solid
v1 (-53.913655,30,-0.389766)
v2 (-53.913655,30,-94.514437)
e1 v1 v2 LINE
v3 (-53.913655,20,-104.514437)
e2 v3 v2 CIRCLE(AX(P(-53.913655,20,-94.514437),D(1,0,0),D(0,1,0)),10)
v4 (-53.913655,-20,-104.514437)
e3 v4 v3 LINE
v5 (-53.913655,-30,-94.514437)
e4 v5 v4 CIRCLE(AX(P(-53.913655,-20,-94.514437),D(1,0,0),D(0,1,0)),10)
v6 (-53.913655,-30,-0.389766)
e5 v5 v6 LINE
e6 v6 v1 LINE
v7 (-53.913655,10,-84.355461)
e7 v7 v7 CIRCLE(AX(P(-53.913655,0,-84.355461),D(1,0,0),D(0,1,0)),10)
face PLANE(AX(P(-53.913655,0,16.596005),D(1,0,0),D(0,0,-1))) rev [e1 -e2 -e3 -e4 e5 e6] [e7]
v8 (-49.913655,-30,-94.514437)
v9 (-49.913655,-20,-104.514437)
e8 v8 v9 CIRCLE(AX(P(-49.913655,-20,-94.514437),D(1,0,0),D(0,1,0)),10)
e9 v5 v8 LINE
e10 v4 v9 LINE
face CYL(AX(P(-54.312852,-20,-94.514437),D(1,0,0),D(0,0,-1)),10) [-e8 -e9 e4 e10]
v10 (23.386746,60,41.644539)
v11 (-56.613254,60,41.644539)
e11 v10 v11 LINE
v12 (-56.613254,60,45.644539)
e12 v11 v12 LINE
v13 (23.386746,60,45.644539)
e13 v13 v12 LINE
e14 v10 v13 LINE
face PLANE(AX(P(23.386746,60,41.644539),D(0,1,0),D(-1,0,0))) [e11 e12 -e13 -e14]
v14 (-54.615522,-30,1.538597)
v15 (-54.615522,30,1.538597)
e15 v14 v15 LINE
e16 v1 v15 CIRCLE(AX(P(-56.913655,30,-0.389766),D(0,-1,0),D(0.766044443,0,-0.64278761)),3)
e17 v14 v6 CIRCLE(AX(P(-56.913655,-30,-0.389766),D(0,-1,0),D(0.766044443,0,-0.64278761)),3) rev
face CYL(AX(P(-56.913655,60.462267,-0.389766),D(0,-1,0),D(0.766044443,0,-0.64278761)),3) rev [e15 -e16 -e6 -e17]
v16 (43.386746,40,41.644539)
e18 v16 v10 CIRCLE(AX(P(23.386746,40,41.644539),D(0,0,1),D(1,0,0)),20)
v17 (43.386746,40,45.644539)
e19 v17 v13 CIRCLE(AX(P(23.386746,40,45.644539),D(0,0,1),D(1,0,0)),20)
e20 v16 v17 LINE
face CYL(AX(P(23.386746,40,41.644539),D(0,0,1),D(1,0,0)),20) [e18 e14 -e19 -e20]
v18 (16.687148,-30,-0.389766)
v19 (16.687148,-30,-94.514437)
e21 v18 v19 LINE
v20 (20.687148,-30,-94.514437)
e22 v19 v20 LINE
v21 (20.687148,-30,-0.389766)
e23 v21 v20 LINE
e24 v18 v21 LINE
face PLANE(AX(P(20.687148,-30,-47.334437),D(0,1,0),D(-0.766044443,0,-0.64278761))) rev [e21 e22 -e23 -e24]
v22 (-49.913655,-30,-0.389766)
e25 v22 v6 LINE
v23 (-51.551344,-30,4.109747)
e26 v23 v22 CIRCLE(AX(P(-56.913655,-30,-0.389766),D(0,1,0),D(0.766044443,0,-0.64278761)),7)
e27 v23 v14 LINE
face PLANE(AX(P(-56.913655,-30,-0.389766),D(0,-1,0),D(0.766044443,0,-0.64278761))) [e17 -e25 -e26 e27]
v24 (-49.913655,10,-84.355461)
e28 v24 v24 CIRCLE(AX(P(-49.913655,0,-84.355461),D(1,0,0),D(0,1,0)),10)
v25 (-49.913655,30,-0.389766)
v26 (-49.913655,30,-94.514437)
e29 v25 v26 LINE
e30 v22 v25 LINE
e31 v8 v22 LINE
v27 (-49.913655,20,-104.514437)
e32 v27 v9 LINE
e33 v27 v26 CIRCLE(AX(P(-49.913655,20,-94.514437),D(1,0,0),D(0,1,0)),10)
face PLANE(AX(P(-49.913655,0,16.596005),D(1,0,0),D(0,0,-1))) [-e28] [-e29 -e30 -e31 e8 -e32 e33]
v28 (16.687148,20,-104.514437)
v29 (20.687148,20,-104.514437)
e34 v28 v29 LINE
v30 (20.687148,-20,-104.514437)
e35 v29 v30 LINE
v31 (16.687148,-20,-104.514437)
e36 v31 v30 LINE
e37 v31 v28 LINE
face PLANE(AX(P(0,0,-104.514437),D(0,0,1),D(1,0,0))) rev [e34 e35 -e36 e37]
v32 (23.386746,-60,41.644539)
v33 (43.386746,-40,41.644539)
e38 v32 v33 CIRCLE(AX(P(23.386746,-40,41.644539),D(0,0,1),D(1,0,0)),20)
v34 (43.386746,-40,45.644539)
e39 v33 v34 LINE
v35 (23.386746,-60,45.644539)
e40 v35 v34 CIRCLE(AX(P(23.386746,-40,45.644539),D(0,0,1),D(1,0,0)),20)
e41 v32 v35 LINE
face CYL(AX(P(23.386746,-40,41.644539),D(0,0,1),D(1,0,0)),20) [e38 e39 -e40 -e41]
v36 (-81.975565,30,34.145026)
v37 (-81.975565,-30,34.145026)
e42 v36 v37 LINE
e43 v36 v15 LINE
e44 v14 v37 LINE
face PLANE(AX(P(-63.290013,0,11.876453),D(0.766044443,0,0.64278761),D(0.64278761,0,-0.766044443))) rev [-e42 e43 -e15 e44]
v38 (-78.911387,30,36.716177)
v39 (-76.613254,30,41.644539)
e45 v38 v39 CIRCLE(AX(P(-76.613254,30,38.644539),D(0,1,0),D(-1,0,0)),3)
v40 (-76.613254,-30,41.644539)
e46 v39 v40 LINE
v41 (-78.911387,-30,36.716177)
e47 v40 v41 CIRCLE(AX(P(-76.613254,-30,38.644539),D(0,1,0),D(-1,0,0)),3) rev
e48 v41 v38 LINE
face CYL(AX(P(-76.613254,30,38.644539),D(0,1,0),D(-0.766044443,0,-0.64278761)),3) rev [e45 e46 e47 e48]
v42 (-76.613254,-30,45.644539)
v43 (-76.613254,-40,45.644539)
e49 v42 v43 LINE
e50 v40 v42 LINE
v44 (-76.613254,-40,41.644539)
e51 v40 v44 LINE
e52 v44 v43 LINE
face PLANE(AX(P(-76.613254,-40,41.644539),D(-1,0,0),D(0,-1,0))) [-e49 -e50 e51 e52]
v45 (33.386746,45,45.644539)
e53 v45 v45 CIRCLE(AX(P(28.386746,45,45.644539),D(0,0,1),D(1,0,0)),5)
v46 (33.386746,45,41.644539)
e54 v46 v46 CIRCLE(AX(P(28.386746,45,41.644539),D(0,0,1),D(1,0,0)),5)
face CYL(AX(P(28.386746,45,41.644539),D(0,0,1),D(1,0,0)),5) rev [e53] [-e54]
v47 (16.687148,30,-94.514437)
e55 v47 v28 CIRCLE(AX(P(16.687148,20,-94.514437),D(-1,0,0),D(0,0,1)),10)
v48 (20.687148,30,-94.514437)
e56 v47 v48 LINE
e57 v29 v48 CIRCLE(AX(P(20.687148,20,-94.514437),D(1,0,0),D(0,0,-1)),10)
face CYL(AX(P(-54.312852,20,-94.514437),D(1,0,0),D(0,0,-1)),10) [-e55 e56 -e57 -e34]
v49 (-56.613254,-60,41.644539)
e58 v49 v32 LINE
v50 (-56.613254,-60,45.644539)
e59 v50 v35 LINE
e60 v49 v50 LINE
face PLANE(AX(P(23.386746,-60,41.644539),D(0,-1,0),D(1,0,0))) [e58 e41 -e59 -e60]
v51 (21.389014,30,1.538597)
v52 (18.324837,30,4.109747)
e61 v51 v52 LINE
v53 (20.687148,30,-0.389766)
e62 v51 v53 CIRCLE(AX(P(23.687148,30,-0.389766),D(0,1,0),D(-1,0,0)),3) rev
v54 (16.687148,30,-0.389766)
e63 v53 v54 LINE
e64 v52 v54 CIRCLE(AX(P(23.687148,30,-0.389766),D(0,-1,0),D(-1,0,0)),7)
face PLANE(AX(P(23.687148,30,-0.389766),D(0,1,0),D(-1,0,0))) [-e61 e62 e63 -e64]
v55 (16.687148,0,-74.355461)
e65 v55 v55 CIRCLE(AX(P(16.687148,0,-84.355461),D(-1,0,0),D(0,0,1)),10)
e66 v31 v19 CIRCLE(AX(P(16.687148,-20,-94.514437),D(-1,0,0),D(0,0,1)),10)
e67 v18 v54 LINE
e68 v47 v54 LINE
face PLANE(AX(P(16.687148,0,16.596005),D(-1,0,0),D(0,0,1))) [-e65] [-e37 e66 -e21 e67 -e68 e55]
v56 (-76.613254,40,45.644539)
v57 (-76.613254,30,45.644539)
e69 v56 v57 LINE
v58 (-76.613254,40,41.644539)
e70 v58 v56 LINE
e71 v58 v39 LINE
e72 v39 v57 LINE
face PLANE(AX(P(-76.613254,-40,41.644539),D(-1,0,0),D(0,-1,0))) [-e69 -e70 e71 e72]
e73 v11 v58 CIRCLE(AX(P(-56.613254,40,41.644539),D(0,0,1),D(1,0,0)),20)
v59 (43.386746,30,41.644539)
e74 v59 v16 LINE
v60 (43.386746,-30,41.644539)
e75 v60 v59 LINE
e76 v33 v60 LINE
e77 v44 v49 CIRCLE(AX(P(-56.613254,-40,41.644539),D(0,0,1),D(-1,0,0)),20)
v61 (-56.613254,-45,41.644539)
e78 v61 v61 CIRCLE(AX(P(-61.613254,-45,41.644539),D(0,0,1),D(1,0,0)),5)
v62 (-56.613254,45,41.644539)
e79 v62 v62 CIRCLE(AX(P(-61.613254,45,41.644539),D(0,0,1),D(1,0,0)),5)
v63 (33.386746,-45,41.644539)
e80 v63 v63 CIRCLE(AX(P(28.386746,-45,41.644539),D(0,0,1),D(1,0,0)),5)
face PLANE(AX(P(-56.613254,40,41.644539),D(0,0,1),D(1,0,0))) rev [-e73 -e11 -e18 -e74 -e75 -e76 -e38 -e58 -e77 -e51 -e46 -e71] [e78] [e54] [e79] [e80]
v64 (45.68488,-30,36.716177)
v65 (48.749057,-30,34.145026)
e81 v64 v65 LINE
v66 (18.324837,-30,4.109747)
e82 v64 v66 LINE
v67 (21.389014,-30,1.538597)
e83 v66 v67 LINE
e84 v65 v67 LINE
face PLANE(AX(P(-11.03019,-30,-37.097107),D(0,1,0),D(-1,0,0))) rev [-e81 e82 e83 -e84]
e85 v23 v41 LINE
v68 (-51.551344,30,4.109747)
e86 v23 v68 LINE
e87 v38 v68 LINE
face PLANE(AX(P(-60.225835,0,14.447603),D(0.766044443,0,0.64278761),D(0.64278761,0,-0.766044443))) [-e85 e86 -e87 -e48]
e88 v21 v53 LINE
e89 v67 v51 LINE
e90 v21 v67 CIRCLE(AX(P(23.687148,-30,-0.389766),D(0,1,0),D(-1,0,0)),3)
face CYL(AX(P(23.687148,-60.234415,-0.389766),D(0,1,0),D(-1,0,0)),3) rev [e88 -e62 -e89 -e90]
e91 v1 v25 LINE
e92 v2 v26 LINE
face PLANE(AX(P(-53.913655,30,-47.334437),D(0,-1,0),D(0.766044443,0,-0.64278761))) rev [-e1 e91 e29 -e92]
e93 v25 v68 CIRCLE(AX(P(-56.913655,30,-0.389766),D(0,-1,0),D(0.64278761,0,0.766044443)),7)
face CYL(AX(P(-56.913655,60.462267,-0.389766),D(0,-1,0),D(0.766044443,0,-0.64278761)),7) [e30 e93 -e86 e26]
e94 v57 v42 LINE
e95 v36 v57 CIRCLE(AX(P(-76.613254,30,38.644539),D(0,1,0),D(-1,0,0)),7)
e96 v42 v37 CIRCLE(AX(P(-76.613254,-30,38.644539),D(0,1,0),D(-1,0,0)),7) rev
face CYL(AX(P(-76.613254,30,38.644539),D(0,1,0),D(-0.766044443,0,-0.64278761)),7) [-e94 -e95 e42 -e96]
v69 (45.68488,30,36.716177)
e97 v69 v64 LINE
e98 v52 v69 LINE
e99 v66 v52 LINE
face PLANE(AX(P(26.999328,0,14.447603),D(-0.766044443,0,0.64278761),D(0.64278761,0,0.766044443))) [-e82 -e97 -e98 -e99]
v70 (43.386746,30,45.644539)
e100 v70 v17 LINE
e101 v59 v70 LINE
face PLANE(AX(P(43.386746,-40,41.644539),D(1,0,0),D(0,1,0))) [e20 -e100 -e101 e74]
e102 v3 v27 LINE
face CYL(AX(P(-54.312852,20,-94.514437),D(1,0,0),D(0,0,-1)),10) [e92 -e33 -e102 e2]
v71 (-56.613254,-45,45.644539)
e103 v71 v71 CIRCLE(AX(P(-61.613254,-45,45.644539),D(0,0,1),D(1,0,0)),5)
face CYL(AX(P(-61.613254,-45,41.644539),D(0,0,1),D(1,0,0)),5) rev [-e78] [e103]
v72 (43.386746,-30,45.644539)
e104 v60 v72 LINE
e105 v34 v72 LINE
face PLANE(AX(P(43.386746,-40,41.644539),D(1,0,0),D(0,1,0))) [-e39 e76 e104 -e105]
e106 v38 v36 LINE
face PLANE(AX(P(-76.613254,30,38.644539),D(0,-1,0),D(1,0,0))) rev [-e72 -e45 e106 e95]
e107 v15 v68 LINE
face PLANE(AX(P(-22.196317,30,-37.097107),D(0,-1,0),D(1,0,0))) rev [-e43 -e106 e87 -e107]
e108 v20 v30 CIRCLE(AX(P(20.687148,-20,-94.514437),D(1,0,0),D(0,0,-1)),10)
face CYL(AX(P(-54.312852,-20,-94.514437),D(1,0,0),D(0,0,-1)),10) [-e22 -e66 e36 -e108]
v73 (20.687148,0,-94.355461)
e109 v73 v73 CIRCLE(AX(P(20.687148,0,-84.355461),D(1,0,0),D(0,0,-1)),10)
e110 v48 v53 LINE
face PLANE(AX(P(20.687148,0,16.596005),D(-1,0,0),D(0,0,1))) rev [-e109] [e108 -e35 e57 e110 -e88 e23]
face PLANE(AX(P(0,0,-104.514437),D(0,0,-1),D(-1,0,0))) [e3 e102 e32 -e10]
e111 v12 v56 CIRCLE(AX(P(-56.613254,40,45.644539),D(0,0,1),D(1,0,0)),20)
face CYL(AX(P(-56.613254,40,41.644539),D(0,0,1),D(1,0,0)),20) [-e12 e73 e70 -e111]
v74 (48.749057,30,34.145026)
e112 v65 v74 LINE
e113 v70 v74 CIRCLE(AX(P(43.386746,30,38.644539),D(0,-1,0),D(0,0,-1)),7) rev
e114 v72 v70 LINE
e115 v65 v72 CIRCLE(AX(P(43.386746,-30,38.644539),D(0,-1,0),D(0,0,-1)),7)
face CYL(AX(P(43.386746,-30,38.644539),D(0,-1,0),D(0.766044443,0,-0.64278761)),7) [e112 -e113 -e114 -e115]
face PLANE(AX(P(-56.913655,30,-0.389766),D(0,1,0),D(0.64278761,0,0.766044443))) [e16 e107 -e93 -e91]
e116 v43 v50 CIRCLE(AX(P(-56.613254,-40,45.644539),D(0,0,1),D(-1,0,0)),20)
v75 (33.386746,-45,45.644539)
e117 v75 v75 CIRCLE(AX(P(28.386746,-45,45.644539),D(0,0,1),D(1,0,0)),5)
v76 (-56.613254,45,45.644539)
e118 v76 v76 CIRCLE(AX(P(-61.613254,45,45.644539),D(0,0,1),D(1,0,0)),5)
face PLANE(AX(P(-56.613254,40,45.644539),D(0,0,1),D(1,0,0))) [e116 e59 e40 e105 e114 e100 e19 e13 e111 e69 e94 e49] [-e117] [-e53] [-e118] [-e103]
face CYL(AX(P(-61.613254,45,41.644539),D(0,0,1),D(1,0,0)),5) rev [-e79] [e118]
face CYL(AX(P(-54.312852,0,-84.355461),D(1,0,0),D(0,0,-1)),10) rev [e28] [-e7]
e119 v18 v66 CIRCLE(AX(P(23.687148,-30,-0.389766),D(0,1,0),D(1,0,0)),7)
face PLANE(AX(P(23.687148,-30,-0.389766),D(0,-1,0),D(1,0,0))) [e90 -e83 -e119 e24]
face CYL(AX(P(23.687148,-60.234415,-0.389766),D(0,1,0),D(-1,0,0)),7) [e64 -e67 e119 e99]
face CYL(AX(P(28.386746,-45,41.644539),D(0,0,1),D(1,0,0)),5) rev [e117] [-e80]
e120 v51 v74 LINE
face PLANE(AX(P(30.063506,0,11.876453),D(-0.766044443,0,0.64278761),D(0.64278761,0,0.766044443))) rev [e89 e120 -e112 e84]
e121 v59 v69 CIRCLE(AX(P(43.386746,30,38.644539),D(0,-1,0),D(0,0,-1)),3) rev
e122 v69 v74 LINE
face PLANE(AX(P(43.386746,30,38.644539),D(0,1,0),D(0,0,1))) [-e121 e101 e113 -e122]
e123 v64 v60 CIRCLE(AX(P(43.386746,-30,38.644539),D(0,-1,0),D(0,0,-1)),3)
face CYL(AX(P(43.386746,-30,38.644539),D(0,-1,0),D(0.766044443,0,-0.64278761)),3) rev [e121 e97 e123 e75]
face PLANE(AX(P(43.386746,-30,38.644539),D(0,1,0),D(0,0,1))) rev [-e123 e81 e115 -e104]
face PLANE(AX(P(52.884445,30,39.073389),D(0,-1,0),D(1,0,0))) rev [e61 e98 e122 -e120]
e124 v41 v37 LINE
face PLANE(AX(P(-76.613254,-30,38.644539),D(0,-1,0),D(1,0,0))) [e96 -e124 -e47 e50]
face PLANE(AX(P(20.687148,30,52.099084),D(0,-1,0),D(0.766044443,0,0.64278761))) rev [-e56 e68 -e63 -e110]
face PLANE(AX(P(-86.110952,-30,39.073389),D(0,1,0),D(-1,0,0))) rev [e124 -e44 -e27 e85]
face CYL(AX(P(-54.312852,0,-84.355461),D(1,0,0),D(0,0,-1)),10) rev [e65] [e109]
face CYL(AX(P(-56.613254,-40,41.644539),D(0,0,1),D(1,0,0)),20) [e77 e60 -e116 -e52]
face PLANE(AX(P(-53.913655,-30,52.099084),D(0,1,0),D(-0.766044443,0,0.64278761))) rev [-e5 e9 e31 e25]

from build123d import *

# Parameters (mm, degrees)
SCHIZZO1_R                           = 5
BASE_FLANGIA1_DEPTH                  = 4
BORDO_FLANGIA1_DEPTH                 = 60
BORDO_FLANGIA1_BEND_DEPTH            = 60
PIEGATURA_START                      = -60
PIEGATURA_DELLO_SCHIZZO1_DEPTH       = 120
PIEGATURA_DELLO_SCHIZZO1_2_DEPTH     = 30
PIEGATURA_START_2                    = 30
PIEGATURA_DELLO_SCHIZZO1_3_DEPTH     = 30
PIEGATURA_START_3                    = -30
PIEGATURA_DELLO_SCHIZZO1_4_OUTLINE_W = 4
PIEGATURA_DELLO_SCHIZZO1_4_OUTLINE_H = 43.334436945
PIEGATURA_DELLO_SCHIZZO1_4_DEPTH     = 60
PIEGATURA_START_4                    = -40
PIEGATURA_DELLO_SCHIZZO1_5_DEPTH     = 79.9999999
PIEGATURA_DELLO_SCHIZZO1_6_DEPTH     = 120
PIEGATURA_START_5                    = -33.183921824
PIEGATURA_DELLO_SCHIZZO1_7_OUTLINE_R = 5
PIEGATURA_DELLO_SCHIZZO1_7_DEPTH     = 4
PIEGATURA_DELLO_SCHIZZO2_DEPTH       = 120
PIEGATURA_DELLO_SCHIZZO2_2_DEPTH     = 30
PIEGATURA_DELLO_SCHIZZO2_3_DEPTH     = 30
PIEGATURA_DELLO_SCHIZZO2_4_DEPTH     = 60
PIEGATURA_DELLO_SCHIZZO2_5_DEPTH     = 79.9999999
PIEGATURA_DELLO_SCHIZZO2_6_DEPTH     = 120
PIEGATURA_START_6                    = 41.644539399
PIEGATURA_DELLO_SCHIZZO2_7_OUTLINE_R = 5
PIEGATURA_DELLO_SCHIZZO2_7_DEPTH     = 4
SCHIZZO25_W                          = 4
SCHIZZO25_H                          = 60
ESTRUSIONE_ESTRUSIONE1_DEPTH         = 57.18
TAGLIO_ESTRUSIONE1_DEPTH             = 75


with BuildPart() as part:
    # Base-Flangia1: sheet metal written as solids
    # Schizzo1 → Base-Flangia1 (new body)
    with BuildSketch(Plane.XY):
        with BuildLine():
            Line((40, -60), (-40, -60))
            ThreePointArc((-40, -60), (-54.142135624, -54.142135624), (-60, -40))
            Line((-60, -40), (-60, 40))
            ThreePointArc((-60, 40), (-54.142135624, 54.142135624), (-40, 60))
            Line((-40, 60), (40, 60))
            ThreePointArc((40, 60), (54.142135624, 54.142135624), (60, 40))
            Line((60, 40), (60, -40))
            ThreePointArc((60, -40), (54.142135624, -54.142135624), (40, -60))
        make_face()
        with Locations((-45, 45)):
            Circle(SCHIZZO1_R, mode=Mode.SUBTRACT)
        with Locations((45, 45)):
            Circle(SCHIZZO1_R, mode=Mode.SUBTRACT)
        with Locations((-45, -45)):
            Circle(SCHIZZO1_R, mode=Mode.SUBTRACT)
        with Locations((45, -45)):
            Circle(SCHIZZO1_R, mode=Mode.SUBTRACT)
    extrude(amount=-BASE_FLANGIA1_DEPTH)

    # Bordo-Flangia1: sheet metal written as solids
    # Bordo-Flangia1 section (on a plane across the edge) → Bordo-Flangia1 (add)
    with BuildSketch(Plane(origin=(-66.433520762, -30, -4), x_dir=(0.7660444431189795, 5.514832408348335e-15, 0.6427876096865378), z_dir=(0, 1, 0))):
        with BuildLine():
            Line((-4, 6.433520762), (-4, 99.433520762))
            Line((-4, 99.433520762), (0, 99.433520762))
            Line((0, 99.433520762), (0, 6.433520762))
            ThreePointArc((0, 6.433520762), (1.732145215, 3.7145974), (4.928362829, 4.135387432))
            Line((4.928362829, 4.135387432), (7.499513268, 1.07120966))
            ThreePointArc((7.499513268, 1.07120966), (0.041672168, 0.089366252), (-4, 6.433520762))
        make_face()
    extrude(amount=BORDO_FLANGIA1_DEPTH)

    # Bordo-Flangia1 section 2 (on a plane across the edge) → Bordo-Flangia1 bend (add)
    with BuildSketch(Plane(origin=(66.433520762, 30, -4), x_dir=(-0.7660444431189795, 0, 0.6427876096865378), z_dir=(0, -1, 0))):
        with BuildLine():
            Line((-4, 6.433520762), (-4, 99.433520762))
            Line((-4, 99.433520762), (0, 99.433520762))
            Line((0, 99.433520762), (0, 6.433520762))
            ThreePointArc((0, 6.433520762), (1.732145215, 3.7145974), (4.928362829, 4.135387432))
            Line((4.928362829, 4.135387432), (7.499513268, 1.07120966))
            ThreePointArc((7.499513268, 1.07120966), (0.041672168, 0.089366252), (-4, 6.433520762))
        make_face()
    extrude(amount=BORDO_FLANGIA1_BEND_DEPTH)

    # Piegatura dello schizzo1: read off the stored shape, not the designer's step
    # Piegatura dello schizzo1 outline → Piegatura dello schizzo1 (cut)
    with BuildSketch(Plane(origin=(0, 0, 0), x_dir=(1, 0, 0), z_dir=(0, 1, 0)).offset(PIEGATURA_START)):
        with BuildLine():
            Line((-36.841112184, 41.814650875), (-40.46038277, 41.17647582))
            Line((-40.46038277, 41.17647582), (-62.777646918, 14.579796095))
            Line((-62.777646918, 14.579796095), (-59.713469145, 12.008645656))
            Line((-59.713469145, 12.008645656), (-32.694338326, 44.208791879))
            ThreePointArc((-32.694338326, 44.208791879), (-34.556649428, 42.64612732), (-36.841112184, 41.814650875))
        make_face()
        with BuildLine():
            Line((-62.284619584, 8.944467884), (-65.348797357, 11.515618323))
            Line((-65.348797357, 11.515618323), (-65.362311102, 11.499513268))
            ThreePointArc((-65.362311102, 11.499513268), (-66.344154509, 4.041672168), (-60, 0))
            Line((-60, 0), (-51.62501785, 0))
            Line((-51.62501785, 0), (-56.39203222, 4))
            Line((-56.39203222, 4), (-60, 4))
            ThreePointArc((-60, 4), (-62.718923361, 5.732145215), (-62.298133329, 8.928362829))
            Line((-62.298133329, 8.928362829), (-62.284619584, 8.944467884))
        make_face()
        Polygon((16.687147766, 4), (-50.169136913, 4), (-45.402122543, 0), (16.687147765, 0), align=None)
        with BuildLine():
            Line((60, 4), (20.687147766, 4))
            Line((20.687147766, 4), (20.687147765, 0))
            Line((20.687147765, 0), (60, 0))
            ThreePointArc((60, 0), (66.344154509, 4.041672168), (65.362311102, 11.499513268))
            Line((65.362311102, 11.499513268), (5.583063401, 82.741646478))
            Line((5.583063401, 82.741646478), (2.518885629, 80.170496039))
            Line((2.518885629, 80.170496039), (62.298133329, 8.928362829))
            ThreePointArc((62.298133329, 8.928362829), (62.718923361, 5.732145215), (60, 4))
        make_face()
    extrude(amount=PIEGATURA_DELLO_SCHIZZO1_DEPTH, mode=Mode.SUBTRACT)

    # Piegatura dello schizzo1 2 outline → Piegatura dello schizzo1 2 (cut)
    with BuildSketch(Plane(origin=(0, 0, 0), x_dir=(1, 0, 0), z_dir=(0, 1, 0)).offset(PIEGATURA_START)):
        Polygon((20.687147766, 4), (16.687147766, 4), (16.687147765, 0), (20.687147765, 0), align=None)
    extrude(amount=PIEGATURA_DELLO_SCHIZZO1_2_DEPTH, mode=Mode.SUBTRACT)

    # Piegatura dello schizzo1 3 outline → Piegatura dello schizzo1 3 (cut)
    with BuildSketch(Plane(origin=(0, 0, 0), x_dir=(1, 0, 0), z_dir=(0, 1, 0)).offset(PIEGATURA_START_2)):
        Polygon((20.687147766, 4), (16.687147766, 4), (16.687147765, 0), (20.687147765, 0), align=None)
    extrude(amount=PIEGATURA_DELLO_SCHIZZO1_3_DEPTH, mode=Mode.SUBTRACT)

    # Piegatura dello schizzo1 4 outline → Piegatura dello schizzo1 4 (add)
    with BuildSketch(Plane(origin=(0, 0, 0), x_dir=(1, 0, 0), z_dir=(0, 1, 0)).offset(PIEGATURA_START_3)):
        with BuildLine():
            ThreePointArc((-80.166548238, 29.170816779), (-81.135962887, 32.245407244), (-78.759129941, 34.423373367))
            Line((-78.759129941, 34.423373367), (-40.46038277, 41.17647582))
            Line((-40.46038277, 41.17647582), (-35.758516099, 46.779942317))
            ThreePointArc((-35.758516099, 46.779942317), (-36.556649428, 46.110228935), (-37.535704895, 45.753881887))
            Line((-37.535704895, 45.753881887), (-79.453722652, 38.362604379))
            ThreePointArc((-79.453722652, 38.362604379), (-84.999666192, 33.280683424), (-82.737698676, 26.106639007))
            Line((-82.737698676, 26.106639007), (-65.348797357, 11.515618323))
            Line((-65.348797357, 11.515618323), (-62.777646918, 14.579796095))
            Line((-62.777646918, 14.579796095), (-80.166548238, 29.170816779))
        make_face()
        Polygon((-50.169136913, 4), (-59.713469145, 12.008645656), (-62.284619584, 8.944467884), (-56.39203222, 4), align=None)
        with BuildLine():
            Line((11.758784936, -47.963696384), (-45.402122543, 0))
            Line((-45.402122543, 0), (-51.62501785, 0))
            Line((-51.62501785, 0), (9.187634497, -51.027874157))
            ThreePointArc((9.187634497, -51.027874157), (16.645475597, -52.009717564), (20.687147765, -45.665563055))
            Line((20.687147765, -45.665563055), (20.687147765, 0))
            Line((20.687147765, 0), (16.687147765, 0))
            Line((16.687147765, 0), (16.687147765, -45.665563055))
            ThreePointArc((16.687147765, -45.665563055), (14.95500255, -48.384486416), (11.758784936, -47.963696384))
        make_face()
        with Locations((18.687147766, 25.667218473)):
            Rectangle(PIEGATURA_DELLO_SCHIZZO1_4_OUTLINE_W, PIEGATURA_DELLO_SCHIZZO1_4_OUTLINE_H)
    extrude(amount=PIEGATURA_DELLO_SCHIZZO1_4_DEPTH)

    # Piegatura dello schizzo1 5 outline → Piegatura dello schizzo1 5 (add)
    with BuildSketch(Plane(origin=(0, 0, 0), x_dir=(1, 0, 0), z_dir=(0, 1, 0)).offset(PIEGATURA_START_4)):
        Polygon((-80.166548238, 29.170816779), (-82.737698676, 26.106639007), (-56.39203222, 4), (-50.169136913, 4), align=None)
        Polygon((11.758784936, -47.963696384), (-45.402122543, 0), (-51.62501785, 0), (9.187634497, -51.027874157), align=None)
    extrude(amount=PIEGATURA_DELLO_SCHIZZO1_5_DEPTH)

    # Piegatura dello schizzo1 6 outline → Piegatura dello schizzo1 6 (add)
    with BuildSketch(Plane(origin=(0, 0, 0), x_dir=(1, 0, 0), z_dir=(0, 1, 0)).offset(PIEGATURA_START)):
        Polygon((-62.777646918, 14.579796095), (-65.348797357, 11.515618323), (-51.62501785, 0), (-45.402122543, 0), align=None)
    extrude(amount=PIEGATURA_DELLO_SCHIZZO1_6_DEPTH)

    # Piegatura dello schizzo1 7 outline → Piegatura dello schizzo1 7 (add)
    with BuildSketch(Plane(origin=(0, 0, 0), x_dir=(0.7660444431125499, 0, 0.6427876096942), z_dir=(0.6427876096942, 0, -0.76604444311255)).offset(PIEGATURA_START_5)):
        with BuildLine():
            Line((-80.161778391, 40), (-80.161778391, -40))
            ThreePointArc((-80.161778391, -40), (-74.303914015, -54.142135624), (-60.161778391, -60))
            Line((-60.161778391, -60), (19.838221609, -60))
            ThreePointArc((19.838221609, -60), (33.980357233, -54.142135624), (39.838221609, -40))
            Line((39.838221609, -40), (39.838221609, 40))
            ThreePointArc((39.838221609, 40), (33.980357233, 54.142135624), (19.838221609, 60))
            Line((19.838221609, 60), (-60.161778391, 60))
            ThreePointArc((-60.161778391, 60), (-74.303914015, 54.142135624), (-80.161778391, 40))
        make_face()
        with Locations((-65.161778391, -45)):
            Circle(PIEGATURA_DELLO_SCHIZZO1_7_OUTLINE_R, mode=Mode.SUBTRACT)
        with Locations((24.838221609, -45)):
            Circle(PIEGATURA_DELLO_SCHIZZO1_7_OUTLINE_R, mode=Mode.SUBTRACT)
        with Locations((-65.161778391, 45)):
            Circle(PIEGATURA_DELLO_SCHIZZO1_7_OUTLINE_R, mode=Mode.SUBTRACT)
        with Locations((24.838221609, 45)):
            Circle(PIEGATURA_DELLO_SCHIZZO1_7_OUTLINE_R, mode=Mode.SUBTRACT)
    extrude(amount=PIEGATURA_DELLO_SCHIZZO1_7_DEPTH)

    # Piegatura dello schizzo2: read off the stored shape, not the designer's step
    # Piegatura dello schizzo2 outline → Piegatura dello schizzo2 (cut)
    with BuildSketch(Plane(origin=(0, 0, 0), x_dir=(1, 0, 0), z_dir=(0, 1, 0)).offset(PIEGATURA_START)):
        with BuildLine():
            Line((20.687147765, -41.6445394), (20.687147765, -6.925039813))
            Line((20.687147765, -6.925039813), (18.324836664, -4.109747071))
            ThreePointArc((18.324836664, -4.109747071), (17.10929942, -2.004374806), (16.687147765, 0.389766197))
            Line((16.687147765, 0.389766197), (16.687147765, -41.6445394))
            Line((16.687147765, -41.6445394), (20.687147765, -41.6445394))
        make_face()
        with BuildLine():
            Line((20.687147765, -45.665563055), (20.687147765, -45.6445394))
            Line((20.687147765, -45.6445394), (16.687147765, -45.6445394))
            Line((16.687147765, -45.6445394), (16.687147765, -45.665563055))
            ThreePointArc((16.687147765, -45.665563055), (14.95500255, -48.384486416), (11.758784936, -47.963696384))
            Line((11.758784936, -47.963696384), (8.994921268, -45.6445394))
            Line((8.994921268, -45.6445394), (2.77202596, -45.6445394))
            Line((2.77202596, -45.6445394), (9.187634497, -51.027874157))
            ThreePointArc((9.187634497, -51.027874157), (16.645475597, -52.009717564), (20.687147765, -45.665563055))
        make_face()
        with BuildLine():
            Line((-1.99498841, -41.6445394), (4.227906898, -41.6445394))
            Line((4.227906898, -41.6445394), (-49.913655163, 3.785625357))
            Line((-49.913655163, 3.785625357), (-49.913655163, 0.389766198))
            ThreePointArc((-49.913655163, 0.389766198), (-49.963662862, -0.445462526), (-50.112971454, -1.268757573))
            Line((-50.112971454, -1.268757573), (-1.99498841, -41.6445394))
        make_face()
        with BuildLine():
            Line((-49.913655163, 43.571315289), (-49.913655163, 39.509608841))
            Line((-49.913655163, 39.509608841), (-36.841112184, 41.814650875))
            ThreePointArc((-36.841112184, 41.814650875), (-34.556649428, 42.64612732), (-32.694338326, 44.208791879))
            Line((-32.694338326, 44.208791879), (-2.518885629, 80.170496039))
            Line((-2.518885629, 80.170496039), (-5.583063401, 82.741646478))
            Line((-5.583063401, 82.741646478), (-35.758516099, 46.779942317))
            ThreePointArc((-35.758516099, 46.779942317), (-36.556649428, 46.110228935), (-37.535704895, 45.753881887))
            Line((-37.535704895, 45.753881887), (-49.913655163, 43.571315289))
        make_face()
        with BuildLine():
            Line((-53.913655163, 1.920394725), (-53.913655163, 7.142023882))
            Line((-53.913655163, 7.142023882), (-80.166548238, 29.170816779))
            ThreePointArc((-80.166548238, 29.170816779), (-81.135962887, 32.245407244), (-78.759129941, 34.423373367))
            Line((-78.759129941, 34.423373367), (-53.913655163, 38.804300919))
            Line((-53.913655163, 38.804300919), (-53.913655163, 42.866007366))
            Line((-53.913655163, 42.866007366), (-79.453722652, 38.362604379))
            ThreePointArc((-79.453722652, 38.362604379), (-84.999666192, 33.280683424), (-82.737698676, 26.106639007))
            Line((-82.737698676, 26.106639007), (-53.913655163, 1.920394725))
        make_face()
    extrude(amount=PIEGATURA_DELLO_SCHIZZO2_DEPTH, mode=Mode.SUBTRACT)

    # Piegatura dello schizzo2 2 outline → Piegatura dello schizzo2 2 (cut)
    with BuildSketch(Plane(origin=(0, 0, 0), x_dir=(1, 0, 0), z_dir=(0, 1, 0)).offset(PIEGATURA_START)):
        with BuildLine():
            Line((-49.913655163, 0.389766198), (-49.913655163, 3.785625357))
            Line((-49.913655163, 3.785625357), (-53.913655163, 7.142023882))
            Line((-53.913655163, 7.142023882), (-53.913655163, 1.920394725))
            Line((-53.913655163, 1.920394725), (-50.112971454, -1.268757573))
            ThreePointArc((-50.112971454, -1.268757573), (-49.963662862, -0.445462526), (-49.913655163, 0.389766198))
        make_face()
    extrude(amount=PIEGATURA_DELLO_SCHIZZO2_2_DEPTH, mode=Mode.SUBTRACT)

    # Piegatura dello schizzo2 3 outline → Piegatura dello schizzo2 3 (cut)
    with BuildSketch(Plane(origin=(0, 0, 0), x_dir=(1, 0, 0), z_dir=(0, 1, 0)).offset(PIEGATURA_START_2)):
        with BuildLine():
            Line((-49.913655163, 0.389766198), (-49.913655163, 3.785625357))
            Line((-49.913655163, 3.785625357), (-53.913655163, 7.142023882))
            Line((-53.913655163, 7.142023882), (-53.913655163, 1.920394725))
            Line((-53.913655163, 1.920394725), (-50.112971454, -1.268757573))
            ThreePointArc((-50.112971454, -1.268757573), (-49.963662862, -0.445462526), (-49.913655163, 0.389766198))
        make_face()
    extrude(amount=PIEGATURA_DELLO_SCHIZZO2_3_DEPTH, mode=Mode.SUBTRACT)

    # Piegatura dello schizzo2 4 outline → Piegatura dello schizzo2 4 (add)
    with BuildSketch(Plane(origin=(0, 0, 0), x_dir=(1, 0, 0), z_dir=(0, 1, 0)).offset(PIEGATURA_START_3)):
        with BuildLine():
            Line((48.749057403, -34.145026132), (21.389014436, -1.538596632))
            ThreePointArc((21.389014436, -1.538596632), (20.868069903, -0.636294233), (20.687147765, 0.389766197))
            Line((20.687147765, 0.389766197), (20.687147765, -6.925039813))
            Line((20.687147765, -6.925039813), (45.68487963, -36.716176571))
            ThreePointArc((45.68487963, -36.716176571), (46.105669662, -39.912394185), (43.386746301, -41.6445394))
            Line((43.386746301, -41.6445394), (20.687147765, -41.6445394))
            Line((20.687147765, -41.6445394), (20.687147765, -45.6445394))
            Line((20.687147765, -45.6445394), (43.386746301, -45.6445394))
            ThreePointArc((43.386746301, -45.6445394), (49.73090081, -41.602867232), (48.749057403, -34.145026132))
        make_face()
        Polygon((8.994921268, -45.6445394), (16.687147765, -45.6445394), (16.687147765, -41.6445394), (4.227906898, -41.6445394), align=None)
        with BuildLine():
            Line((-76.613253699, -45.644539399), (2.77202596, -45.6445394))
            Line((2.77202596, -45.6445394), (-1.99498841, -41.6445394))
            Line((-1.99498841, -41.6445394), (-76.613253699, -41.644539399))
            ThreePointArc((-76.613253699, -41.644539399), (-79.33217706, -39.912394184), (-78.911387028, -36.71617657))
            Line((-78.911387028, -36.71617657), (-51.551344061, -4.10974707))
            ThreePointArc((-51.551344061, -4.10974707), (-50.668463731, -2.772129433), (-50.112971454, -1.268757573))
            Line((-50.112971454, -1.268757573), (-53.913655163, 1.920394725))
            Line((-53.913655163, 1.920394725), (-53.913655163, 0.389766198))
            ThreePointArc((-53.913655163, 0.389766198), (-54.0945773, -0.636294232), (-54.615521833, -1.538596631))
            Line((-54.615521833, -1.538596631), (-81.975564801, -34.145026131))
            ThreePointArc((-81.975564801, -34.145026131), (-82.957408208, -41.602867231), (-76.613253699, -45.644539399))
        make_face()
        Polygon((-53.913655163, 7.142023882), (-49.913655163, 3.785625357), (-49.913655163, 39.509608841), (-53.913655163, 38.804300919), align=None)
        Polygon((-53.913655163, 42.866007366), (-49.913655163, 43.571315289), (-49.913655163, 47.334436946), (-53.913655163, 47.334436946), align=None)
    extrude(amount=PIEGATURA_DELLO_SCHIZZO2_4_DEPTH)

    # Piegatura dello schizzo2 5 outline → Piegatura dello schizzo2 5 (add)
    with BuildSketch(Plane(origin=(0, 0, 0), x_dir=(1, 0, 0), z_dir=(0, 1, 0)).offset(PIEGATURA_START_4)):
        Polygon((43.386746301, -45.6445394), (43.386746301, -41.6445394), (4.227906898, -41.6445394), (8.994921268, -45.6445394), align=None)
        Polygon((-76.613253699, -45.644539399), (2.77202596, -45.6445394), (-1.99498841, -41.6445394), (-76.613253699, -41.644539399), align=None)
    extrude(amount=PIEGATURA_DELLO_SCHIZZO2_5_DEPTH)

    # Piegatura dello schizzo2 6 outline → Piegatura dello schizzo2 6 (add)
    with BuildSketch(Plane(origin=(0, 0, 0), x_dir=(1, 0, 0), z_dir=(0, 1, 0)).offset(PIEGATURA_START)):
        Polygon((20.687147765, -45.6445394), (20.687147765, -41.6445394), (-1.99498841, -41.6445394), (2.77202596, -45.6445394), align=None)
    extrude(amount=PIEGATURA_DELLO_SCHIZZO2_6_DEPTH)

    # Piegatura dello schizzo2 7 outline → Piegatura dello schizzo2 7 (add)
    with BuildSketch(Plane.XY.offset(PIEGATURA_START_6)):
        with BuildLine():
            ThreePointArc((-56.613253699, 60), (-70.755389322, 54.142135624), (-76.613253699, 40))
            Line((-76.613253699, 40), (-76.613253699, -40))
            ThreePointArc((-76.613253699, -40), (-70.755389322, -54.142135624), (-56.613253699, -60))
            Line((-56.613253699, -60), (23.386746301, -60))
            ThreePointArc((23.386746301, -60), (37.528881925, -54.142135624), (43.386746301, -40))
            Line((43.386746301, -40), (43.386746301, 40))
            ThreePointArc((43.386746301, 40), (37.528881925, 54.142135624), (23.386746301, 60))
            Line((23.386746301, 60), (-56.613253699, 60))
        make_face()
        with Locations((-61.613253699, -45)):
            Circle(PIEGATURA_DELLO_SCHIZZO2_7_OUTLINE_R, mode=Mode.SUBTRACT)
        with Locations((28.386746301, -45)):
            Circle(PIEGATURA_DELLO_SCHIZZO2_7_OUTLINE_R, mode=Mode.SUBTRACT)
        with Locations((-61.613253699, 45)):
            Circle(PIEGATURA_DELLO_SCHIZZO2_7_OUTLINE_R, mode=Mode.SUBTRACT)
        with Locations((28.386746301, 45)):
            Circle(PIEGATURA_DELLO_SCHIZZO2_7_OUTLINE_R, mode=Mode.SUBTRACT)
    extrude(amount=PIEGATURA_DELLO_SCHIZZO2_7_DEPTH)

    # Schizzo25 → Estrusione-Estrusione1 (add)
    with BuildSketch(Plane(origin=(0, 0, -47.334436945), x_dir=(-1.0, 0, -1.000266536266281e-11), z_dir=(1.000266536266281e-11, 4.012514324582407e-15, -1.0))):
        with Locations((-18.687147765, 0)):
            Rectangle(SCHIZZO25_W, SCHIZZO25_H)
        with Locations((51.913655163, 0)):
            Rectangle(SCHIZZO25_W, SCHIZZO25_H)
    extrude(amount=ESTRUSIONE_ESTRUSIONE1_DEPTH)

    # Schizzo26 → Taglio-Estrusione1 (cut)
    with BuildSketch(Plane(origin=(20.687147765, 0, 0), x_dir=(1.0002665362662809e-11, 0, -1.0), z_dir=(1.0, 2.37833744873856e-15, 1.0002665362662809e-11))):
        with BuildLine():
            ThreePointArc((74.355460601, 0), (84.355460601, -10), (94.355460601, 0))
            Line((94.355460601, 0), (74.355460601, 0))
        make_face()
        with BuildLine():
            Line((74.355460601, 0), (94.355460601, 0))
            ThreePointArc((94.355460601, 0), (84.355460601, 10), (74.355460601, 0))
        make_face()
        with BuildLine():
            Line((104.514436945, -30), (104.514436945, -20))
            ThreePointArc((104.514436945, -20), (101.585504757, -27.071067812), (94.514436945, -30))
            Line((94.514436945, -30), (104.514436945, -30))
        make_face()
        with BuildLine():
            ThreePointArc((94.514436945, 30), (101.585504757, 27.071067812), (104.514436945, 20))
            Line((104.514436945, 20), (104.514436945, 30))
            Line((104.514436945, 30), (94.514436945, 30))
        make_face()
    extrude(amount=-TAGLIO_ESTRUSIONE1_DEPTH, mode=Mode.SUBTRACT)


solid = part.part
